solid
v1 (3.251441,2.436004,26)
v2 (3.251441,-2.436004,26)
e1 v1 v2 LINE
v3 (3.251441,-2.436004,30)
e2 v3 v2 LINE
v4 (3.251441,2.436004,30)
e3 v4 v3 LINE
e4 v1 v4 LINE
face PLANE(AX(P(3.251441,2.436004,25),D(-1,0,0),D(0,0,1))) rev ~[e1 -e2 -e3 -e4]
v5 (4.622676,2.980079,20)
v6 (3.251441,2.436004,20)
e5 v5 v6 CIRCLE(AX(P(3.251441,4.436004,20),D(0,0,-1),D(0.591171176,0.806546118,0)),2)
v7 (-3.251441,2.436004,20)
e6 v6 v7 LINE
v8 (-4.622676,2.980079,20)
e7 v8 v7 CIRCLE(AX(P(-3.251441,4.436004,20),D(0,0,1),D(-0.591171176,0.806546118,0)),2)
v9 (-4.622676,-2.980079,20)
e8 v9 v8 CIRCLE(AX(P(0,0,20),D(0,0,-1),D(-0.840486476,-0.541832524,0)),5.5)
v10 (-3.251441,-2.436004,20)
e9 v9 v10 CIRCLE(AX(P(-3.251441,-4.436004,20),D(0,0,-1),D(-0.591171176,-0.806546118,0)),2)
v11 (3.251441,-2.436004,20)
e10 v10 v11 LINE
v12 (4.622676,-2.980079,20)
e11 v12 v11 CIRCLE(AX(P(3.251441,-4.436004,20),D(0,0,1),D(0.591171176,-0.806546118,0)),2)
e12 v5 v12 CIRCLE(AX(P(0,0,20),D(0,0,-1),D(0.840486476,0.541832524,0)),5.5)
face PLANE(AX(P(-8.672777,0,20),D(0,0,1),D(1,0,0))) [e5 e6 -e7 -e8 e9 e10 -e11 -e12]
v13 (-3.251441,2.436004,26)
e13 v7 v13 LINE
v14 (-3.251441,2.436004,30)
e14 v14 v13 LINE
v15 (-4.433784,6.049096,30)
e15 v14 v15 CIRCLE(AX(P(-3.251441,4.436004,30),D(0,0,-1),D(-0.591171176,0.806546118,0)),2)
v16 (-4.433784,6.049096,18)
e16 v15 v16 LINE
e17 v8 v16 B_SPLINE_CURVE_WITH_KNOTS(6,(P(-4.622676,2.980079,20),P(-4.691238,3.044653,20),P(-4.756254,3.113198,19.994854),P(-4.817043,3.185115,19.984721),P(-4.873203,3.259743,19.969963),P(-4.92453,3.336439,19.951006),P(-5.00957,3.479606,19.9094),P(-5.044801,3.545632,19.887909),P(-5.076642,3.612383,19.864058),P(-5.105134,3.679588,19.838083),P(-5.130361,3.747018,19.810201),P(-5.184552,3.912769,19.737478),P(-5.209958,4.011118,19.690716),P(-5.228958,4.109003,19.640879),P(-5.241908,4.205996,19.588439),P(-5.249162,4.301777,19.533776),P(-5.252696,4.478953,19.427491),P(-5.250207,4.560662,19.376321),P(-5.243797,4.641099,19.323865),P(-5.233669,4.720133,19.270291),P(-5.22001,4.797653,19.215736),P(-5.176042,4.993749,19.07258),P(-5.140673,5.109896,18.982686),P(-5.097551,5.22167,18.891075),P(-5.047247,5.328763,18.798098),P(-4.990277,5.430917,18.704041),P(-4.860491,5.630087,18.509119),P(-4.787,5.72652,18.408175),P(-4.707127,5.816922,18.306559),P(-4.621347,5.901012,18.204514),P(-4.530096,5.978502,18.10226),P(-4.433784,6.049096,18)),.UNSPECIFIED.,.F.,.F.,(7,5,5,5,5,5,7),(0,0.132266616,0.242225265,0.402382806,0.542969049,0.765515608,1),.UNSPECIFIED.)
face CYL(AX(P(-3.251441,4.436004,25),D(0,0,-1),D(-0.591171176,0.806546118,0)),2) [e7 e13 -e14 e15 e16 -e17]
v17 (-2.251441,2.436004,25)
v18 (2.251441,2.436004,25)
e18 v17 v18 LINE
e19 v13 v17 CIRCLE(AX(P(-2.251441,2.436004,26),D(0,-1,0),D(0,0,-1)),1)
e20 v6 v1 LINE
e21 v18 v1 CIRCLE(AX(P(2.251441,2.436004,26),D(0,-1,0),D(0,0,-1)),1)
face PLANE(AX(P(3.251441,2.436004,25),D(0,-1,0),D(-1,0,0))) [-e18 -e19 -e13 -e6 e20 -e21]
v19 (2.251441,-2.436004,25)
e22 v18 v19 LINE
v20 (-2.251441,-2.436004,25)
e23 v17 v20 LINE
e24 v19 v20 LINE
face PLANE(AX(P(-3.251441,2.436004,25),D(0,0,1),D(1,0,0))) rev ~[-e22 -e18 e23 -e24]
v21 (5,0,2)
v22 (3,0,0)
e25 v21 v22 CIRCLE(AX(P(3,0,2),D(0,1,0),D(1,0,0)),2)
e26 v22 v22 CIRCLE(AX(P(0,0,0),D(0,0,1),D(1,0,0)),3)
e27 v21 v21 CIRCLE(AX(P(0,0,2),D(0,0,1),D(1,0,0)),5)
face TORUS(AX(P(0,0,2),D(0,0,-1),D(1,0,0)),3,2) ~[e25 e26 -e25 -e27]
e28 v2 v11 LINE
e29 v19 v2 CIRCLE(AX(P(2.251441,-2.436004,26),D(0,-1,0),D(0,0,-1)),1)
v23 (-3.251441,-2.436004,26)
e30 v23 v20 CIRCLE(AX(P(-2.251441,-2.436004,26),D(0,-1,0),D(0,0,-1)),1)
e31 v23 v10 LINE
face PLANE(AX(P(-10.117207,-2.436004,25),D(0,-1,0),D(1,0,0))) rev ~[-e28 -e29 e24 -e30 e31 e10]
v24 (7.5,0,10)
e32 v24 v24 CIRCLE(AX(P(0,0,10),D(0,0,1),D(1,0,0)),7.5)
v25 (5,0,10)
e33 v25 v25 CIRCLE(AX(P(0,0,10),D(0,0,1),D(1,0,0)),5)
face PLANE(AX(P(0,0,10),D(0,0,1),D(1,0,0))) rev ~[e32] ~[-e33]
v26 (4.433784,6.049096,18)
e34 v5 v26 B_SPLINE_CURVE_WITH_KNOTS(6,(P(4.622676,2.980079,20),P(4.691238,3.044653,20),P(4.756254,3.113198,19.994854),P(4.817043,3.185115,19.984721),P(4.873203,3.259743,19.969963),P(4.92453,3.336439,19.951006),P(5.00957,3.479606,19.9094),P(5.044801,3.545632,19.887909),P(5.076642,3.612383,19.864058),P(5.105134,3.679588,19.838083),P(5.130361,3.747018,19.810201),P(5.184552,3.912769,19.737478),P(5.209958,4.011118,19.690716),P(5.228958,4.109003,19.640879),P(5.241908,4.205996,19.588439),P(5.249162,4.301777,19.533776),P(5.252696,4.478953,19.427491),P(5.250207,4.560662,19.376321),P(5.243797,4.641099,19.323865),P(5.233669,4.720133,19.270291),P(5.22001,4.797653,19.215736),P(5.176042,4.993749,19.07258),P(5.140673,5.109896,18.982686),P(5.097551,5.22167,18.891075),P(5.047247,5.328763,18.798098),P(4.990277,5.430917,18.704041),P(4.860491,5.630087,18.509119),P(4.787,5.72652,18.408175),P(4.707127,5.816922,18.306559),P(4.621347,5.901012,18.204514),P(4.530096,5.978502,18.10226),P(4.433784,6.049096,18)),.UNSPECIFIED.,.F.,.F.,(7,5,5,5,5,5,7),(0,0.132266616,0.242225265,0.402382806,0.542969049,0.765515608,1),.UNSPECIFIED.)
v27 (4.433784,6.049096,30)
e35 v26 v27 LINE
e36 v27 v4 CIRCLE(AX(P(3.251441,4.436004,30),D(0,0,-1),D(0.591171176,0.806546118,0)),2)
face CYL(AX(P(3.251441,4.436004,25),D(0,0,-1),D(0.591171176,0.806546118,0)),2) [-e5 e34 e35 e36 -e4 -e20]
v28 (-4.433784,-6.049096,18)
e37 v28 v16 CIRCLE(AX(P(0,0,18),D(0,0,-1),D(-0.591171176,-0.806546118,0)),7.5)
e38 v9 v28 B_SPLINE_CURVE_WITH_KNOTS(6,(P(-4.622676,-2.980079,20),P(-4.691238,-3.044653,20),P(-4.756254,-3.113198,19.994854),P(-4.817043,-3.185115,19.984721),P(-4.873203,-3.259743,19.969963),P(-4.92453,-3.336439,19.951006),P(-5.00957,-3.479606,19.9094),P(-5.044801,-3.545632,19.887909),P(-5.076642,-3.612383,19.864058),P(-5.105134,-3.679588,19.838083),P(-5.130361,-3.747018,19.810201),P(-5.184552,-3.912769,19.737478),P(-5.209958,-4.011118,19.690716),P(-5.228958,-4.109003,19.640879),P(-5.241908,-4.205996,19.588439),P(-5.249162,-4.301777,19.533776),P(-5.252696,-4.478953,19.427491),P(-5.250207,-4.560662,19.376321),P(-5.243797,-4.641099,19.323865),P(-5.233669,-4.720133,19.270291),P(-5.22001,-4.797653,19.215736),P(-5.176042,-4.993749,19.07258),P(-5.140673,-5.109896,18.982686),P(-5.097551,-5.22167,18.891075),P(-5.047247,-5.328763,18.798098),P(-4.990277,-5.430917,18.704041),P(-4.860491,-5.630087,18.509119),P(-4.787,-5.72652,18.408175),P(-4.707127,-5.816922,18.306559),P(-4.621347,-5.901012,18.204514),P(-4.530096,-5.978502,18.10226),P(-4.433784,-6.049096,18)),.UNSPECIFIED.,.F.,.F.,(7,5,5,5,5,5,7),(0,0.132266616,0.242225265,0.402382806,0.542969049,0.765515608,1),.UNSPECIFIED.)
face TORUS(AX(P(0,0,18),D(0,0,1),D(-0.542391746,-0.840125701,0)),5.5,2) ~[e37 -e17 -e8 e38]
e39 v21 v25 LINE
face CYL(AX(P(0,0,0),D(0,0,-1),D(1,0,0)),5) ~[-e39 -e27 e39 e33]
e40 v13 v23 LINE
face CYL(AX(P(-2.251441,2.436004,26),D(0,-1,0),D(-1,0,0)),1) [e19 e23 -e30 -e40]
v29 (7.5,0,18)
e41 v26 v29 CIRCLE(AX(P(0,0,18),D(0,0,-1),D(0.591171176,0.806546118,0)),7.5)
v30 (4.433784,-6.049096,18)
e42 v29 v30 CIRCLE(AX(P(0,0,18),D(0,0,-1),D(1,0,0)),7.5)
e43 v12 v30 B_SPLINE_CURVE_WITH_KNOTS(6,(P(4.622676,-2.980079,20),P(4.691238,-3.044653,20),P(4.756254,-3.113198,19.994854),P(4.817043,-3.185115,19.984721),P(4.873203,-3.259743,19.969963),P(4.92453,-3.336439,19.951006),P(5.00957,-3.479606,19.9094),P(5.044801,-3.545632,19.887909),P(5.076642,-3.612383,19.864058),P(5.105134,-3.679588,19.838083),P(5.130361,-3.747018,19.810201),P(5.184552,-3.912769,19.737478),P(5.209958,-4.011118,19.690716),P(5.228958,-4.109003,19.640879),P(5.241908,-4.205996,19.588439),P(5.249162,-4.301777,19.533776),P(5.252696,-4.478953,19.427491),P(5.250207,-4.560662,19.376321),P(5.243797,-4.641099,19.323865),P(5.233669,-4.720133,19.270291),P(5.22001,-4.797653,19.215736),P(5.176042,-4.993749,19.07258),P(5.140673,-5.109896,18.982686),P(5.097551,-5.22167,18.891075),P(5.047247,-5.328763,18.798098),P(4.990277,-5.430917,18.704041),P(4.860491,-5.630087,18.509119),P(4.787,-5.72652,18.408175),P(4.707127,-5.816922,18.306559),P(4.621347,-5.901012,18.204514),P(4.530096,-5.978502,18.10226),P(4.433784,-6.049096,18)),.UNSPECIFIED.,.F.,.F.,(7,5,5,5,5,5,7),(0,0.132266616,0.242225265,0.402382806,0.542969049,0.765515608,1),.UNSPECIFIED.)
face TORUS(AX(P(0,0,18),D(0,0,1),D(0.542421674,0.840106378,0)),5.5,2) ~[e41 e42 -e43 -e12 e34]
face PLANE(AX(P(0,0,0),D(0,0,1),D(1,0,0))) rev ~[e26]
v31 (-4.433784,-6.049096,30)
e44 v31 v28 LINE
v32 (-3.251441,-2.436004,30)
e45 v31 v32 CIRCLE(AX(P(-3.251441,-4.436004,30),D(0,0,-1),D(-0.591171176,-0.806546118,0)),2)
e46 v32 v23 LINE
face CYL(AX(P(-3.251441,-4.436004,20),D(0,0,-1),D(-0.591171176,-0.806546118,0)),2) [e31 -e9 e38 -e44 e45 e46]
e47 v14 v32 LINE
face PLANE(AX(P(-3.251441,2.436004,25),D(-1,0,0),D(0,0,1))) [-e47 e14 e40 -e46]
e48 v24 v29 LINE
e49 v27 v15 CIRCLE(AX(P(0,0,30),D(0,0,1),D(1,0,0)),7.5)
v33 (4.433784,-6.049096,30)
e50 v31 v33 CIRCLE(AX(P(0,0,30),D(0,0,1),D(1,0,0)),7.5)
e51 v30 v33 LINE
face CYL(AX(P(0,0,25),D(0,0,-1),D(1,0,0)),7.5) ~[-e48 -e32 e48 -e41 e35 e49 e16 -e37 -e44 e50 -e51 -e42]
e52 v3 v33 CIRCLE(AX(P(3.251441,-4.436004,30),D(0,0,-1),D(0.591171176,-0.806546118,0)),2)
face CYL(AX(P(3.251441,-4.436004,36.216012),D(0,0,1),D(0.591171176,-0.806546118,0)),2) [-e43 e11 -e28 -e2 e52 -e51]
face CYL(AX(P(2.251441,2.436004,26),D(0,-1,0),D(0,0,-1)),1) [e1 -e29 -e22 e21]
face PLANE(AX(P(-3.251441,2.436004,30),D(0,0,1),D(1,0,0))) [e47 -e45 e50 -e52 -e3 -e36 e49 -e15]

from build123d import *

# Parameters (mm, degrees)
F0_R         = 5
F1_DEPTH     = 10
F2_R         = 7.5
F2_R_2       = 5
F3_DEPTH     = 15
F5_DEPTH     = 5
F6_T1_DEPTH  = 16.216012475
F6_T6_ANGLE  = 57.151354628
F6_T11_ANGLE = 114.30679143
F6_T17_ANGLE = 57.151354628
F6_T23_ANGLE = 57.151354628
F6_T27_DEPTH = 27.4320249501
F6_T34_DEPTH = 27.4320249501
F6_T38_ANGLE = 114.30679143
F6_T45_ANGLE = 114.30679143
F6_T49_DEPTH = 27.4320249501
F6_T56_DEPTH = 27.4320249501
F6_T60_ANGLE = 57.151354628
F7_R         = 2
F8_DEPTH     = 5
F9_W         = 6.5028829414
F9_H         = 5
F10_DEPTH    = 6
F11_R        = 1


# Not quite as in the source:
# - a fillet or chamfer that OpenCascade refuses, or shapes differently, is made with other operations: its cross-section is extruded or revolved along the edge and cut away or added


with BuildPart() as f1:
    # F0 (on Top) → F1 (new body)
    with BuildSketch(Plane.XY):
        Circle(F0_R)
    extrude(amount=F1_DEPTH)

    # F2 (on face) → F3 (join)
    with BuildSketch(Plane.XY.offset(10)):
        Circle(F2_R)
        Circle(F2_R_2, mode=Mode.SUBTRACT)
        Circle(F2_R_2)
    extrude(amount=F3_DEPTH)

    # F4 (on face) → F5 (cut)
    with BuildSketch(Plane.XY.offset(25)):
        with BuildLine():
            Line((-10.1172067225, -2.4360036477), (-7.0933691733, -2.4360036477))
            ThreePointArc((-7.0933691733, -2.4360036477), (-7.5, 0), (-7.0933691733, 2.4360036477))
            Line((-7.0933691733, 2.4360036477), (-10.1172067225, 2.4360036477))
            Line((-10.1172067225, 2.4360036477), (-10.1172067225, -2.4360036477))
        make_face()
        with BuildLine():
            Line((-7.0933691733, -2.4360036477), (7.0933691733, -2.4360036477))
            ThreePointArc((7.0933691733, -2.4360036477), (7.3976438411, -1.2348544855), (7.5, 0))
            ThreePointArc((7.5, 0), (7.3976438411, 1.2348544855), (7.0933691733, 2.4360036477))
            Line((7.0933691733, 2.4360036477), (-7.0933691733, 2.4360036477))
            ThreePointArc((-7.0933691733, 2.4360036477), (-7.5, 0), (-7.0933691733, -2.4360036477))
        make_face()
        with BuildLine():
            Line((7.0933691733, -2.4360036477), (10.1172067225, -2.4360036477))
            Line((10.1172067225, -2.4360036477), (10.1172067225, 2.4360036477))
            Line((10.1172067225, 2.4360036477), (7.0933691733, 2.4360036477))
            ThreePointArc((7.0933691733, 2.4360036477), (7.3976438411, 1.2348544855), (7.5, 0))
            ThreePointArc((7.5, 0), (7.3976438411, -1.2348544855), (7.0933691733, -2.4360036477))
        make_face()
    extrude(amount=-F5_DEPTH, mode=Mode.SUBTRACT)

    # F6: fillet of radius 2 on 7 edges, made by hand

    # F6_s2 → F6_t1 (cut)
    with BuildSketch(Plane.XY.offset(20)):
        with BuildLine():
            ThreePointArc((-4.4337838236, 6.0490958833), (-5.1522550427, 3.8139845448), (-3.2514414707, 2.4360036477))
            Line((-3.2514414707, 2.4360036477), (-7.0933691733, 2.4360036477))
            ThreePointArc((-7.0933691733, 2.4360036477), (-6.0400681229, 4.4460743438), (-4.4337838236, 6.0490958833))
        make_face()
        with BuildLine():
            ThreePointArc((4.4337838236, 6.0490958833), (5.1522550427, 3.8139845448), (3.2514414707, 2.4360036477))
            Line((3.2514414707, 2.4360036477), (7.0933691733, 2.4360036477))
            ThreePointArc((7.0933691733, 2.4360036477), (6.0400681229, 4.4460743438), (4.4337838236, 6.0490958833))
        make_face()
        with BuildLine():
            ThreePointArc((4.4337838236, -6.0490958833), (5.1522550427, -3.8139845448), (3.2514414707, -2.4360036477))
            Line((3.2514414707, -2.4360036477), (7.0933691733, -2.4360036477))
            ThreePointArc((7.0933691733, -2.4360036477), (6.0400681229, -4.4460743438), (4.4337838236, -6.0490958833))
        make_face()
        with BuildLine():
            ThreePointArc((-4.4337838236, -6.0490958833), (-5.1522550427, -3.8139845448), (-3.2514414707, -2.4360036477))
            Line((-3.2514414707, -2.4360036477), (-7.0933691733, -2.4360036477))
            ThreePointArc((-7.0933691733, -2.4360036477), (-6.0400681229, -4.4460743438), (-4.4337838236, -6.0490958833))
        make_face()
    extrude(amount=F6_T1_DEPTH, mode=Mode.SUBTRACT)


with BuildPart() as f6_tool4:
    # F6_s5 → F6_t6 (revolve)
    with BuildSketch(Plane.XZ):
        with BuildLine():
            ThreePointArc((7.5, 18), (6.9142135624, 19.4142135624), (5.5, 20))
            Line((5.5, 20), (7.5, 20))
            Line((7.5, 20), (7.5, 18))
        make_face()
    revolve(axis=Axis((0, 0, 20), (0, 0, -1)), revolution_arc=F6_T6_ANGLE)

    split(bisect_by=Plane.XZ.offset(2.4360036477), keep=Keep.BOTTOM)


with BuildPart() as f1_1:
    add(f1.part)

    # F6_t3: cut F6_tool4
    add(f6_tool4.part, mode=Mode.SUBTRACT)


with BuildPart() as f6_tool9:
    # F6_s10 → F6_t11 (revolve)
    with BuildSketch(Plane(origin=(0, 0, 0), x_dir=(0, 0, 1), z_dir=(0.840125701, -0.5423917464, 0))):
        with BuildLine():
            ThreePointArc((18, 7.5), (19.4142135624, 6.9142135624), (20, 5.5))
            Line((20, 5.5), (20, 7.5))
            Line((20, 7.5), (18, 7.5))
        make_face()
    revolve(axis=Axis((0, 0, 20), (0, 0, -1)), revolution_arc=F6_T11_ANGLE)

    split(bisect_by=Plane.XZ.offset(-2.4360036477), keep=Keep.TOP)

    split(bisect_by=Plane.XZ.offset(2.4360036477), keep=Keep.BOTTOM)


with BuildPart() as f1_2:
    add(f1_1.part)

    # F6_t8: cut F6_tool9
    add(f6_tool9.part, mode=Mode.SUBTRACT)


with BuildPart() as f6_tool15:
    # F6_s16 → F6_t17 (revolve)
    with BuildSketch(Plane(origin=(0, 0, 0), x_dir=(0, 0, 1), z_dir=(-0.8401063785, 0.5424216744, 0))):
        with BuildLine():
            ThreePointArc((18, 7.5), (19.4142135624, 6.9142135624), (20, 5.5))
            Line((20, 5.5), (20, 7.5))
            Line((20, 7.5), (18, 7.5))
        make_face()
    revolve(axis=Axis((0, 0, 20), (0, 0, -1)), revolution_arc=F6_T17_ANGLE)

    split(bisect_by=Plane.XZ.offset(-2.4360036477), keep=Keep.TOP)


with BuildPart() as f1_3:
    add(f1_2.part)

    # F6_t14: cut F6_tool15
    add(f6_tool15.part, mode=Mode.SUBTRACT)


with BuildPart() as f6_tool21:
    # F6_s22 → F6_t23 (revolve)
    with BuildSketch(Plane.XZ):
        with BuildLine():
            ThreePointArc((7.5, 18), (6.9142135624, 19.4142135624), (5.5, 20))
            Line((5.5, 20), (7.5, 20))
            Line((7.5, 20), (7.5, 18))
        make_face()
    revolve(axis=Axis((0, 0, 20), (0, 0, -1)), revolution_arc=F6_T23_ANGLE)

    split(bisect_by=Plane.XZ.offset(2.4360036477), keep=Keep.TOP)


with BuildPart() as f6_tool25:
    # F6_s26 → F6_t27 (new body)
    with BuildSketch(Plane.XY.offset(36.216012475)):
        with BuildLine():
            ThreePointArc((4.4337838236, -6.0490958833), (5.1522550427, -3.8139845448), (3.2514414707, -2.4360036477))
            Line((3.2514414707, -2.4360036477), (7.0933691733, -2.4360036477))
            ThreePointArc((7.0933691733, -2.4360036477), (6.0400681229, -4.4460743438), (4.4337838236, -6.0490958833))
        make_face()
    extrude(amount=-F6_T27_DEPTH)

    split(bisect_by=Plane.XY.offset(20), keep=Keep.BOTTOM)


with BuildPart() as f6_tool21_1:
    add(f6_tool21.part)

    # F6_t29: intersect F6_tool25
    add(f6_tool25.part, mode=Mode.INTERSECT)


with BuildPart() as f1_4:
    add(f1_3.part)

    # F6_t19: cut F6_tool21
    add(f6_tool21_1.part, mode=Mode.SUBTRACT)


with BuildPart() as f6_tool32:
    # F6_s33 → F6_t34 (new body)
    with BuildSketch(Plane.XY.offset(36.216012475)):
        with BuildLine():
            ThreePointArc((-4.4337838236, -6.0490958833), (-5.1522550427, -3.8139845448), (-3.2514414707, -2.4360036477))
            Line((-3.2514414707, -2.4360036477), (-7.0933691733, -2.4360036477))
            ThreePointArc((-7.0933691733, -2.4360036477), (-6.0400681229, -4.4460743438), (-4.4337838236, -6.0490958833))
        make_face()
    extrude(amount=-F6_T34_DEPTH)

    split(bisect_by=Plane.XY.offset(20), keep=Keep.BOTTOM)


with BuildPart() as f6_tool36:
    # F6_s37 → F6_t38 (revolve)
    with BuildSketch(Plane(origin=(0, 0, 0), x_dir=(0, 0, 1), z_dir=(0.840125701, -0.5423917464, 0))):
        with BuildLine():
            ThreePointArc((18, 7.5), (19.4142135624, 6.9142135624), (20, 5.5))
            Line((20, 5.5), (20, 7.5))
            Line((20, 7.5), (18, 7.5))
        make_face()
    revolve(axis=Axis((0, 0, 20), (0, 0, -1)), revolution_arc=F6_T38_ANGLE)

    split(bisect_by=Plane.XZ.offset(2.4360036477), keep=Keep.TOP)


with BuildPart() as f6_tool32_1:
    add(f6_tool32.part)

    # F6_t40: intersect F6_tool36
    add(f6_tool36.part, mode=Mode.INTERSECT)


with BuildPart() as f1_5:
    add(f1_4.part)

    # F6_t30: cut F6_tool32
    add(f6_tool32_1.part, mode=Mode.SUBTRACT)


with BuildPart() as f6_tool43:
    # F6_s44 → F6_t45 (revolve)
    with BuildSketch(Plane(origin=(0, 0, 0), x_dir=(0, 0, 1), z_dir=(0.840125701, -0.5423917464, 0))):
        with BuildLine():
            ThreePointArc((18, 7.5), (19.4142135624, 6.9142135624), (20, 5.5))
            Line((20, 5.5), (20, 7.5))
            Line((20, 7.5), (18, 7.5))
        make_face()
    revolve(axis=Axis((0, 0, 20), (0, 0, -1)), revolution_arc=F6_T45_ANGLE)

    split(bisect_by=Plane.XZ.offset(-2.4360036477), keep=Keep.BOTTOM)


with BuildPart() as f6_tool47:
    # F6_s48 → F6_t49 (new body)
    with BuildSketch(Plane.XY.offset(36.216012475)):
        with BuildLine():
            ThreePointArc((-4.4337838236, 6.0490958833), (-5.1522550427, 3.8139845448), (-3.2514414707, 2.4360036477))
            Line((-3.2514414707, 2.4360036477), (-7.0933691733, 2.4360036477))
            ThreePointArc((-7.0933691733, 2.4360036477), (-6.0400681229, 4.4460743438), (-4.4337838236, 6.0490958833))
        make_face()
    extrude(amount=-F6_T49_DEPTH)

    split(bisect_by=Plane.XY.offset(20), keep=Keep.BOTTOM)


with BuildPart() as f6_tool43_1:
    add(f6_tool43.part)

    # F6_t51: intersect F6_tool47
    add(f6_tool47.part, mode=Mode.INTERSECT)


with BuildPart() as f1_6:
    add(f1_5.part)

    # F6_t41: cut F6_tool43
    add(f6_tool43_1.part, mode=Mode.SUBTRACT)


with BuildPart() as f6_tool54:
    # F6_s55 → F6_t56 (new body)
    with BuildSketch(Plane.XY.offset(36.216012475)):
        with BuildLine():
            ThreePointArc((4.4337838236, 6.0490958833), (5.1522550427, 3.8139845448), (3.2514414707, 2.4360036477))
            Line((3.2514414707, 2.4360036477), (7.0933691733, 2.4360036477))
            ThreePointArc((7.0933691733, 2.4360036477), (6.0400681229, 4.4460743438), (4.4337838236, 6.0490958833))
        make_face()
    extrude(amount=-F6_T56_DEPTH)

    split(bisect_by=Plane.XY.offset(20), keep=Keep.BOTTOM)


with BuildPart() as f6_tool58:
    # F6_s59 → F6_t60 (revolve)
    with BuildSketch(Plane(origin=(0, 0, 0), x_dir=(0, 0, 1), z_dir=(-0.8401063785, 0.5424216744, 0))):
        with BuildLine():
            ThreePointArc((18, 7.5), (19.4142135624, 6.9142135624), (20, 5.5))
            Line((20, 5.5), (20, 7.5))
            Line((20, 7.5), (18, 7.5))
        make_face()
    revolve(axis=Axis((0, 0, 20), (0, 0, -1)), revolution_arc=F6_T60_ANGLE)

    split(bisect_by=Plane.XZ.offset(-2.4360036477), keep=Keep.BOTTOM)


with BuildPart() as f6_tool54_1:
    add(f6_tool54.part)

    # F6_t62: intersect F6_tool58
    add(f6_tool58.part, mode=Mode.INTERSECT)


with BuildPart() as f1_7:
    add(f1_6.part)

    # F6_t52: cut F6_tool54
    add(f6_tool54_1.part, mode=Mode.SUBTRACT)

    # F7
    f7_edges = [f1_7.edges().sort_by_distance(p)[0] for p in [
        (-5, 0, 0),
    ]]
    fillet(f7_edges, radius=F7_R)

    # F8 (add): faces of the model
    f8_faces = [f1_7.faces().sort_by_distance(p)[0] for p in [
        (0, 4.7439045523, 25),
        (0, -4.7439045523, 25),
    ]]
    extrude(f8_faces, amount=F8_DEPTH)

    # F9 (on face) → F10 (join)
    with BuildSketch(Plane.XZ.offset(-2.4360036477)):
        with Locations((0, 27.5)):
            Rectangle(F9_W, F9_H)
    extrude(amount=F10_DEPTH)

    # F11
    f11_edges = [f1_7.edges().sort_by_distance(p)[0] for p in [
        (3.251441, 0, 25),
        (-3.251441, 0, 25),
    ]]
    fillet(f11_edges, radius=F11_R)


solid = f1_7.part
